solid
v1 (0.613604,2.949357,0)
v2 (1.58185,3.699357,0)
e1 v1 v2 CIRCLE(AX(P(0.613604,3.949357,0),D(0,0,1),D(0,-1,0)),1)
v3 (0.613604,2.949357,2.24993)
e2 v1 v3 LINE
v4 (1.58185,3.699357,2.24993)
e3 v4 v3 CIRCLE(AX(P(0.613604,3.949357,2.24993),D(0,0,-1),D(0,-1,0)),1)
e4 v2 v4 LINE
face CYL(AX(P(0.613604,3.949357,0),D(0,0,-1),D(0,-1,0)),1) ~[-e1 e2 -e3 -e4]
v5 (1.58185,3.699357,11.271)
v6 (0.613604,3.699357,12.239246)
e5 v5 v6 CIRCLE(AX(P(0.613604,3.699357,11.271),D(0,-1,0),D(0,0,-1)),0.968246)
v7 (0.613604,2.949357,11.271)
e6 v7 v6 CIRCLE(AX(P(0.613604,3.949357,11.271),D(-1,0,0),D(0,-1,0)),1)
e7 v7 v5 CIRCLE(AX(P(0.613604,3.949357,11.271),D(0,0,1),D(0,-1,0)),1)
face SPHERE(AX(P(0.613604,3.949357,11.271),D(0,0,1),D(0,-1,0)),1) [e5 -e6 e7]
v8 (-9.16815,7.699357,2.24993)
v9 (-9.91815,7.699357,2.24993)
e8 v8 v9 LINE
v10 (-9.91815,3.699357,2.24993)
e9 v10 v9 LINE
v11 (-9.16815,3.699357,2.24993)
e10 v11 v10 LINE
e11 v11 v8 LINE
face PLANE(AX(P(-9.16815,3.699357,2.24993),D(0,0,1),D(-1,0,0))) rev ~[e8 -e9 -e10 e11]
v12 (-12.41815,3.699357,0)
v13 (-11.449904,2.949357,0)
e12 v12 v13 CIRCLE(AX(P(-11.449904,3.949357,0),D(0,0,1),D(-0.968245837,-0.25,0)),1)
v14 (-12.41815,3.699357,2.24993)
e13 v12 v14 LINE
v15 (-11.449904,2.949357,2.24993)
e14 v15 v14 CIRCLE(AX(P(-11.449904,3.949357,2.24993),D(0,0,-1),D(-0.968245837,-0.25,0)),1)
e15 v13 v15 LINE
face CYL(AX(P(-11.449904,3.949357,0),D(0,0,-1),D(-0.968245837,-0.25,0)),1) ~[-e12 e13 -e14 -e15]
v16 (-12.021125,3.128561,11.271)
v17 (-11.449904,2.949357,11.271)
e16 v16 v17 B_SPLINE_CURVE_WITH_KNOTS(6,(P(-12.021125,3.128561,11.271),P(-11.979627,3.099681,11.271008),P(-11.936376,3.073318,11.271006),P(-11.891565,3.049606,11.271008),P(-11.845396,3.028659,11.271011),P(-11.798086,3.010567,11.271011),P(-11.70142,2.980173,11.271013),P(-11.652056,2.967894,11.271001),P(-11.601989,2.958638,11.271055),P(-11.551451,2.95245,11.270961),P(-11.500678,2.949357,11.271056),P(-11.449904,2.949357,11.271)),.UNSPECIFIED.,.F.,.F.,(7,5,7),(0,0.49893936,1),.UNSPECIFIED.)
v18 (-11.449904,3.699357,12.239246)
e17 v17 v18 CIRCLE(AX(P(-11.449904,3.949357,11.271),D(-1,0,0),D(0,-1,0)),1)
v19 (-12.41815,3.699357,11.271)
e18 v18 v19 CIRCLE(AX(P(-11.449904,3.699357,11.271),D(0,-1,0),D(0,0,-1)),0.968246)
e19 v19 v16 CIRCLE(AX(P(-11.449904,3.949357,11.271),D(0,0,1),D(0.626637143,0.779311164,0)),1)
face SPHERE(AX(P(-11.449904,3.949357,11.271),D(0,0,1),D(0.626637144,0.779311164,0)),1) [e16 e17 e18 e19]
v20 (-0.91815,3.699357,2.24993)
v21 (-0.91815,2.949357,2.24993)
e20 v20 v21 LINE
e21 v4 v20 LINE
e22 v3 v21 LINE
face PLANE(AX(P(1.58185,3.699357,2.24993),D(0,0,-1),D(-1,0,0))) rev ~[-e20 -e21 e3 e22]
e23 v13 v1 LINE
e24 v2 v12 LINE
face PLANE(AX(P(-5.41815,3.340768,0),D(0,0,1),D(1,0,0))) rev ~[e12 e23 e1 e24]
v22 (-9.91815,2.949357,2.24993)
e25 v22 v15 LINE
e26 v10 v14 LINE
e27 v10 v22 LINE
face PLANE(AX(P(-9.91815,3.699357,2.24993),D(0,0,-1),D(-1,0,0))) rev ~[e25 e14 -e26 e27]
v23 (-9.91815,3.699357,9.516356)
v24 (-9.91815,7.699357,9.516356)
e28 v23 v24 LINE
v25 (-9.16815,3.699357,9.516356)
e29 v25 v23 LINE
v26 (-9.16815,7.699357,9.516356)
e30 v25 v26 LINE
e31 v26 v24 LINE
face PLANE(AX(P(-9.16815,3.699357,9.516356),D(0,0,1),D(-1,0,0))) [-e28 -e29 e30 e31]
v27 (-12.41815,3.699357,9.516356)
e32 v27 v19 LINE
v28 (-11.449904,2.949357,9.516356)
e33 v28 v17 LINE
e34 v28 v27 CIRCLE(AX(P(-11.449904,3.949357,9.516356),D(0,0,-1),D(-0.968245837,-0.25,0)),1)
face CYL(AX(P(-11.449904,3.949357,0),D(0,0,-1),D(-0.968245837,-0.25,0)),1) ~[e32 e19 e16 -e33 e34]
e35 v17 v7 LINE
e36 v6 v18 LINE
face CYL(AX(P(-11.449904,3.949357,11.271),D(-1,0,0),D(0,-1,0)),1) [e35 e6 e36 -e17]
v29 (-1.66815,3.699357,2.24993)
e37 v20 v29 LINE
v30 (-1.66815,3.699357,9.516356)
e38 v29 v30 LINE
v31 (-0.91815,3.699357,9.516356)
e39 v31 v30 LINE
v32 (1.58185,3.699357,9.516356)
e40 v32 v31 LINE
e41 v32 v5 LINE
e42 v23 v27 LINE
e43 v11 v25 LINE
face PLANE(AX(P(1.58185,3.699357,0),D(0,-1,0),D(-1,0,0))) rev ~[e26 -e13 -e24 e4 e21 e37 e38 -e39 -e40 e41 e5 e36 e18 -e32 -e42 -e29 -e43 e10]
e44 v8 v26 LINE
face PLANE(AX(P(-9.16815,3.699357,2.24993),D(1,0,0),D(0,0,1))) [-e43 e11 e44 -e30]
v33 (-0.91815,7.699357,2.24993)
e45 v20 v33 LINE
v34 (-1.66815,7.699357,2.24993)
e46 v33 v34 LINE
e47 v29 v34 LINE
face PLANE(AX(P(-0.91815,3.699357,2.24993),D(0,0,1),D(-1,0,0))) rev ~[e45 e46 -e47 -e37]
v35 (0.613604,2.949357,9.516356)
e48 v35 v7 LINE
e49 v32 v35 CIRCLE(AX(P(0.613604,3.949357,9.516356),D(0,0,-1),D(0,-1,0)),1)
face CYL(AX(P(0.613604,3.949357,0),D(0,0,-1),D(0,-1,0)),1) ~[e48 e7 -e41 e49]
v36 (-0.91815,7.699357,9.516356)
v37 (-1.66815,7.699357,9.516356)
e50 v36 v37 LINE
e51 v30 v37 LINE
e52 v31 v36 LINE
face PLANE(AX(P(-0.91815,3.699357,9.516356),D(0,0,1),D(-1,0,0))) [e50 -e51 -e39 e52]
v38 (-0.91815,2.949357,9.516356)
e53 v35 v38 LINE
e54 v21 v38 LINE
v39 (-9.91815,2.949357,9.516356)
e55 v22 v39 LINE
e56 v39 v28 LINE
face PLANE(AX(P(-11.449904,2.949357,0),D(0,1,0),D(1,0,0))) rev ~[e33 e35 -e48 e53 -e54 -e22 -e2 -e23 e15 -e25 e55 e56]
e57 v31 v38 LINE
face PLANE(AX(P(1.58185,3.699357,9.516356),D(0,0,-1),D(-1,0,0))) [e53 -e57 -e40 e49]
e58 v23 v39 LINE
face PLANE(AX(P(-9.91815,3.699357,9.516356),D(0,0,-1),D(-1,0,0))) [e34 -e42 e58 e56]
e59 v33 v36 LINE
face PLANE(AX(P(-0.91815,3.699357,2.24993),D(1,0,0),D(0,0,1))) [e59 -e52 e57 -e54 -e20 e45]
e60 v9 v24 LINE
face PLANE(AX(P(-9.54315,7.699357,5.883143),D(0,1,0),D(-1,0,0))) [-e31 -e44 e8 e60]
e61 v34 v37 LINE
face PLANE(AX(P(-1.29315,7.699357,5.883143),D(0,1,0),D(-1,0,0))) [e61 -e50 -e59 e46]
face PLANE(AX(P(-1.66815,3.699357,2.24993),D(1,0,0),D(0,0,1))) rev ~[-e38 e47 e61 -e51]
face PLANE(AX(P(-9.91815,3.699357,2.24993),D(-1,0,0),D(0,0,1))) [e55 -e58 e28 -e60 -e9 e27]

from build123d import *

# Parameters (mm, degrees)
F1_DEPTH    = 12.271
F2_T1_DEPTH = 12.0635083269
F2_T4_ANGLE = 218.8024505591
F2_T6_ANGLE = 218.8024505591
F3_W        = 2.5
F3_H        = 7.2664258366
F4_DEPTH    = 0.751
F5_W        = 0.75
F5_H        = 7.2664258366
F6_DEPTH    = 4


# Not quite as in the source:
# - a fillet or chamfer that OpenCascade refuses, or shapes differently, is made with other operations: its cross-section is extruded or revolved along the edge and cut away or added


with BuildPart() as f1:
    # F0 (on Top) → F1 (new body)
    with BuildSketch(Plane.XY):
        with BuildLine():
            Line((1.5818497799, 3.6993569562), (-12.4181502201, 3.6993569562))
            ThreePointArc((-12.4181502201, 3.6993569562), (-12.0622768192, 3.1587875411), (-11.4499043835, 2.9493569562))
            Line((-11.4499043835, 2.9493569562), (0.6136039434, 2.9493569562))
            ThreePointArc((0.6136039434, 2.9493569562), (1.2259763791, 3.1587875411), (1.5818497799, 3.6993569562))
        make_face()
    extrude(amount=F1_DEPTH)

    # F2: fillet of radius 1 on 1 edges, made by hand

    # F2_s2 → F2_t1 (cut)
    with BuildSketch(Plane.YZ.offset(-11.4499043835)):
        with BuildLine():
            ThreePointArc((2.9493569562, 11.271), (3.242250175, 11.9781067812), (3.9493569562, 12.271))
            Line((3.9493569562, 12.271), (2.9493569562, 12.271))
            Line((2.9493569562, 12.271), (2.9493569562, 11.271))
        make_face()
    extrude(amount=F2_T1_DEPTH, mode=Mode.SUBTRACT)

    # F2_s3 → F2_t4 (revolve, cut)
    with BuildSketch(Plane(origin=(-8.8824733702, 7.1423174648, 0), x_dir=(0, 0, 1), z_dir=(0.7793111642, -0.6266371433, 0))):
        with BuildLine():
            ThreePointArc((11.271, 3.0971574071), (11.9781067812, 3.3900506259), (12.271, 4.0971574071))
            Line((12.271, 4.0971574071), (12.271, 3.0971574071))
            Line((12.271, 3.0971574071), (11.271, 3.0971574071))
        make_face()
    revolve(axis=Axis((-11.4499043835, 3.9493569562, 12.271), (0, 0, 1)), revolution_arc=F2_T4_ANGLE, mode=Mode.SUBTRACT)

    # F2_s5 → F2_t6 (revolve, cut)
    with BuildSketch(Plane.YZ.offset(0.6136039434)):
        with BuildLine():
            ThreePointArc((2.9493569562, 11.271), (3.242250175, 11.9781067812), (3.9493569562, 12.271))
            Line((3.9493569562, 12.271), (2.9493569562, 12.271))
            Line((2.9493569562, 12.271), (2.9493569562, 11.271))
        make_face()
    revolve(axis=Axis((0.6136039434, 3.9493569562, 12.271), (0, 0, 1)), revolution_arc=F2_T6_ANGLE, mode=Mode.SUBTRACT)

    # F3 (on face) → F4 (cut, through all)
    with BuildSketch(Plane(origin=(0, 3.6993569562, 0), x_dir=(-1, 0, 0), z_dir=(0, 1, 0))):
        with Locations((11.1681502201, 5.8831429183)):
            Rectangle(F3_W, F3_H)
        with Locations((-0.3318497799, 5.8831429183)):
            Rectangle(F3_W, F3_H)
    extrude(amount=-F4_DEPTH, mode=Mode.SUBTRACT)

    # F5 (on face) → F6 (join)
    with BuildSketch(Plane(origin=(0, 3.6993569562, 0), x_dir=(-1, 0, 0), z_dir=(0, 1, 0))):
        with Locations((1.2931502201, 5.8831429183)):
            Rectangle(F5_W, F5_H)
        with Locations((9.5431502201, 5.8831429183)):
            Rectangle(F5_W, F5_H)
    extrude(amount=F6_DEPTH)


solid = f1.part
